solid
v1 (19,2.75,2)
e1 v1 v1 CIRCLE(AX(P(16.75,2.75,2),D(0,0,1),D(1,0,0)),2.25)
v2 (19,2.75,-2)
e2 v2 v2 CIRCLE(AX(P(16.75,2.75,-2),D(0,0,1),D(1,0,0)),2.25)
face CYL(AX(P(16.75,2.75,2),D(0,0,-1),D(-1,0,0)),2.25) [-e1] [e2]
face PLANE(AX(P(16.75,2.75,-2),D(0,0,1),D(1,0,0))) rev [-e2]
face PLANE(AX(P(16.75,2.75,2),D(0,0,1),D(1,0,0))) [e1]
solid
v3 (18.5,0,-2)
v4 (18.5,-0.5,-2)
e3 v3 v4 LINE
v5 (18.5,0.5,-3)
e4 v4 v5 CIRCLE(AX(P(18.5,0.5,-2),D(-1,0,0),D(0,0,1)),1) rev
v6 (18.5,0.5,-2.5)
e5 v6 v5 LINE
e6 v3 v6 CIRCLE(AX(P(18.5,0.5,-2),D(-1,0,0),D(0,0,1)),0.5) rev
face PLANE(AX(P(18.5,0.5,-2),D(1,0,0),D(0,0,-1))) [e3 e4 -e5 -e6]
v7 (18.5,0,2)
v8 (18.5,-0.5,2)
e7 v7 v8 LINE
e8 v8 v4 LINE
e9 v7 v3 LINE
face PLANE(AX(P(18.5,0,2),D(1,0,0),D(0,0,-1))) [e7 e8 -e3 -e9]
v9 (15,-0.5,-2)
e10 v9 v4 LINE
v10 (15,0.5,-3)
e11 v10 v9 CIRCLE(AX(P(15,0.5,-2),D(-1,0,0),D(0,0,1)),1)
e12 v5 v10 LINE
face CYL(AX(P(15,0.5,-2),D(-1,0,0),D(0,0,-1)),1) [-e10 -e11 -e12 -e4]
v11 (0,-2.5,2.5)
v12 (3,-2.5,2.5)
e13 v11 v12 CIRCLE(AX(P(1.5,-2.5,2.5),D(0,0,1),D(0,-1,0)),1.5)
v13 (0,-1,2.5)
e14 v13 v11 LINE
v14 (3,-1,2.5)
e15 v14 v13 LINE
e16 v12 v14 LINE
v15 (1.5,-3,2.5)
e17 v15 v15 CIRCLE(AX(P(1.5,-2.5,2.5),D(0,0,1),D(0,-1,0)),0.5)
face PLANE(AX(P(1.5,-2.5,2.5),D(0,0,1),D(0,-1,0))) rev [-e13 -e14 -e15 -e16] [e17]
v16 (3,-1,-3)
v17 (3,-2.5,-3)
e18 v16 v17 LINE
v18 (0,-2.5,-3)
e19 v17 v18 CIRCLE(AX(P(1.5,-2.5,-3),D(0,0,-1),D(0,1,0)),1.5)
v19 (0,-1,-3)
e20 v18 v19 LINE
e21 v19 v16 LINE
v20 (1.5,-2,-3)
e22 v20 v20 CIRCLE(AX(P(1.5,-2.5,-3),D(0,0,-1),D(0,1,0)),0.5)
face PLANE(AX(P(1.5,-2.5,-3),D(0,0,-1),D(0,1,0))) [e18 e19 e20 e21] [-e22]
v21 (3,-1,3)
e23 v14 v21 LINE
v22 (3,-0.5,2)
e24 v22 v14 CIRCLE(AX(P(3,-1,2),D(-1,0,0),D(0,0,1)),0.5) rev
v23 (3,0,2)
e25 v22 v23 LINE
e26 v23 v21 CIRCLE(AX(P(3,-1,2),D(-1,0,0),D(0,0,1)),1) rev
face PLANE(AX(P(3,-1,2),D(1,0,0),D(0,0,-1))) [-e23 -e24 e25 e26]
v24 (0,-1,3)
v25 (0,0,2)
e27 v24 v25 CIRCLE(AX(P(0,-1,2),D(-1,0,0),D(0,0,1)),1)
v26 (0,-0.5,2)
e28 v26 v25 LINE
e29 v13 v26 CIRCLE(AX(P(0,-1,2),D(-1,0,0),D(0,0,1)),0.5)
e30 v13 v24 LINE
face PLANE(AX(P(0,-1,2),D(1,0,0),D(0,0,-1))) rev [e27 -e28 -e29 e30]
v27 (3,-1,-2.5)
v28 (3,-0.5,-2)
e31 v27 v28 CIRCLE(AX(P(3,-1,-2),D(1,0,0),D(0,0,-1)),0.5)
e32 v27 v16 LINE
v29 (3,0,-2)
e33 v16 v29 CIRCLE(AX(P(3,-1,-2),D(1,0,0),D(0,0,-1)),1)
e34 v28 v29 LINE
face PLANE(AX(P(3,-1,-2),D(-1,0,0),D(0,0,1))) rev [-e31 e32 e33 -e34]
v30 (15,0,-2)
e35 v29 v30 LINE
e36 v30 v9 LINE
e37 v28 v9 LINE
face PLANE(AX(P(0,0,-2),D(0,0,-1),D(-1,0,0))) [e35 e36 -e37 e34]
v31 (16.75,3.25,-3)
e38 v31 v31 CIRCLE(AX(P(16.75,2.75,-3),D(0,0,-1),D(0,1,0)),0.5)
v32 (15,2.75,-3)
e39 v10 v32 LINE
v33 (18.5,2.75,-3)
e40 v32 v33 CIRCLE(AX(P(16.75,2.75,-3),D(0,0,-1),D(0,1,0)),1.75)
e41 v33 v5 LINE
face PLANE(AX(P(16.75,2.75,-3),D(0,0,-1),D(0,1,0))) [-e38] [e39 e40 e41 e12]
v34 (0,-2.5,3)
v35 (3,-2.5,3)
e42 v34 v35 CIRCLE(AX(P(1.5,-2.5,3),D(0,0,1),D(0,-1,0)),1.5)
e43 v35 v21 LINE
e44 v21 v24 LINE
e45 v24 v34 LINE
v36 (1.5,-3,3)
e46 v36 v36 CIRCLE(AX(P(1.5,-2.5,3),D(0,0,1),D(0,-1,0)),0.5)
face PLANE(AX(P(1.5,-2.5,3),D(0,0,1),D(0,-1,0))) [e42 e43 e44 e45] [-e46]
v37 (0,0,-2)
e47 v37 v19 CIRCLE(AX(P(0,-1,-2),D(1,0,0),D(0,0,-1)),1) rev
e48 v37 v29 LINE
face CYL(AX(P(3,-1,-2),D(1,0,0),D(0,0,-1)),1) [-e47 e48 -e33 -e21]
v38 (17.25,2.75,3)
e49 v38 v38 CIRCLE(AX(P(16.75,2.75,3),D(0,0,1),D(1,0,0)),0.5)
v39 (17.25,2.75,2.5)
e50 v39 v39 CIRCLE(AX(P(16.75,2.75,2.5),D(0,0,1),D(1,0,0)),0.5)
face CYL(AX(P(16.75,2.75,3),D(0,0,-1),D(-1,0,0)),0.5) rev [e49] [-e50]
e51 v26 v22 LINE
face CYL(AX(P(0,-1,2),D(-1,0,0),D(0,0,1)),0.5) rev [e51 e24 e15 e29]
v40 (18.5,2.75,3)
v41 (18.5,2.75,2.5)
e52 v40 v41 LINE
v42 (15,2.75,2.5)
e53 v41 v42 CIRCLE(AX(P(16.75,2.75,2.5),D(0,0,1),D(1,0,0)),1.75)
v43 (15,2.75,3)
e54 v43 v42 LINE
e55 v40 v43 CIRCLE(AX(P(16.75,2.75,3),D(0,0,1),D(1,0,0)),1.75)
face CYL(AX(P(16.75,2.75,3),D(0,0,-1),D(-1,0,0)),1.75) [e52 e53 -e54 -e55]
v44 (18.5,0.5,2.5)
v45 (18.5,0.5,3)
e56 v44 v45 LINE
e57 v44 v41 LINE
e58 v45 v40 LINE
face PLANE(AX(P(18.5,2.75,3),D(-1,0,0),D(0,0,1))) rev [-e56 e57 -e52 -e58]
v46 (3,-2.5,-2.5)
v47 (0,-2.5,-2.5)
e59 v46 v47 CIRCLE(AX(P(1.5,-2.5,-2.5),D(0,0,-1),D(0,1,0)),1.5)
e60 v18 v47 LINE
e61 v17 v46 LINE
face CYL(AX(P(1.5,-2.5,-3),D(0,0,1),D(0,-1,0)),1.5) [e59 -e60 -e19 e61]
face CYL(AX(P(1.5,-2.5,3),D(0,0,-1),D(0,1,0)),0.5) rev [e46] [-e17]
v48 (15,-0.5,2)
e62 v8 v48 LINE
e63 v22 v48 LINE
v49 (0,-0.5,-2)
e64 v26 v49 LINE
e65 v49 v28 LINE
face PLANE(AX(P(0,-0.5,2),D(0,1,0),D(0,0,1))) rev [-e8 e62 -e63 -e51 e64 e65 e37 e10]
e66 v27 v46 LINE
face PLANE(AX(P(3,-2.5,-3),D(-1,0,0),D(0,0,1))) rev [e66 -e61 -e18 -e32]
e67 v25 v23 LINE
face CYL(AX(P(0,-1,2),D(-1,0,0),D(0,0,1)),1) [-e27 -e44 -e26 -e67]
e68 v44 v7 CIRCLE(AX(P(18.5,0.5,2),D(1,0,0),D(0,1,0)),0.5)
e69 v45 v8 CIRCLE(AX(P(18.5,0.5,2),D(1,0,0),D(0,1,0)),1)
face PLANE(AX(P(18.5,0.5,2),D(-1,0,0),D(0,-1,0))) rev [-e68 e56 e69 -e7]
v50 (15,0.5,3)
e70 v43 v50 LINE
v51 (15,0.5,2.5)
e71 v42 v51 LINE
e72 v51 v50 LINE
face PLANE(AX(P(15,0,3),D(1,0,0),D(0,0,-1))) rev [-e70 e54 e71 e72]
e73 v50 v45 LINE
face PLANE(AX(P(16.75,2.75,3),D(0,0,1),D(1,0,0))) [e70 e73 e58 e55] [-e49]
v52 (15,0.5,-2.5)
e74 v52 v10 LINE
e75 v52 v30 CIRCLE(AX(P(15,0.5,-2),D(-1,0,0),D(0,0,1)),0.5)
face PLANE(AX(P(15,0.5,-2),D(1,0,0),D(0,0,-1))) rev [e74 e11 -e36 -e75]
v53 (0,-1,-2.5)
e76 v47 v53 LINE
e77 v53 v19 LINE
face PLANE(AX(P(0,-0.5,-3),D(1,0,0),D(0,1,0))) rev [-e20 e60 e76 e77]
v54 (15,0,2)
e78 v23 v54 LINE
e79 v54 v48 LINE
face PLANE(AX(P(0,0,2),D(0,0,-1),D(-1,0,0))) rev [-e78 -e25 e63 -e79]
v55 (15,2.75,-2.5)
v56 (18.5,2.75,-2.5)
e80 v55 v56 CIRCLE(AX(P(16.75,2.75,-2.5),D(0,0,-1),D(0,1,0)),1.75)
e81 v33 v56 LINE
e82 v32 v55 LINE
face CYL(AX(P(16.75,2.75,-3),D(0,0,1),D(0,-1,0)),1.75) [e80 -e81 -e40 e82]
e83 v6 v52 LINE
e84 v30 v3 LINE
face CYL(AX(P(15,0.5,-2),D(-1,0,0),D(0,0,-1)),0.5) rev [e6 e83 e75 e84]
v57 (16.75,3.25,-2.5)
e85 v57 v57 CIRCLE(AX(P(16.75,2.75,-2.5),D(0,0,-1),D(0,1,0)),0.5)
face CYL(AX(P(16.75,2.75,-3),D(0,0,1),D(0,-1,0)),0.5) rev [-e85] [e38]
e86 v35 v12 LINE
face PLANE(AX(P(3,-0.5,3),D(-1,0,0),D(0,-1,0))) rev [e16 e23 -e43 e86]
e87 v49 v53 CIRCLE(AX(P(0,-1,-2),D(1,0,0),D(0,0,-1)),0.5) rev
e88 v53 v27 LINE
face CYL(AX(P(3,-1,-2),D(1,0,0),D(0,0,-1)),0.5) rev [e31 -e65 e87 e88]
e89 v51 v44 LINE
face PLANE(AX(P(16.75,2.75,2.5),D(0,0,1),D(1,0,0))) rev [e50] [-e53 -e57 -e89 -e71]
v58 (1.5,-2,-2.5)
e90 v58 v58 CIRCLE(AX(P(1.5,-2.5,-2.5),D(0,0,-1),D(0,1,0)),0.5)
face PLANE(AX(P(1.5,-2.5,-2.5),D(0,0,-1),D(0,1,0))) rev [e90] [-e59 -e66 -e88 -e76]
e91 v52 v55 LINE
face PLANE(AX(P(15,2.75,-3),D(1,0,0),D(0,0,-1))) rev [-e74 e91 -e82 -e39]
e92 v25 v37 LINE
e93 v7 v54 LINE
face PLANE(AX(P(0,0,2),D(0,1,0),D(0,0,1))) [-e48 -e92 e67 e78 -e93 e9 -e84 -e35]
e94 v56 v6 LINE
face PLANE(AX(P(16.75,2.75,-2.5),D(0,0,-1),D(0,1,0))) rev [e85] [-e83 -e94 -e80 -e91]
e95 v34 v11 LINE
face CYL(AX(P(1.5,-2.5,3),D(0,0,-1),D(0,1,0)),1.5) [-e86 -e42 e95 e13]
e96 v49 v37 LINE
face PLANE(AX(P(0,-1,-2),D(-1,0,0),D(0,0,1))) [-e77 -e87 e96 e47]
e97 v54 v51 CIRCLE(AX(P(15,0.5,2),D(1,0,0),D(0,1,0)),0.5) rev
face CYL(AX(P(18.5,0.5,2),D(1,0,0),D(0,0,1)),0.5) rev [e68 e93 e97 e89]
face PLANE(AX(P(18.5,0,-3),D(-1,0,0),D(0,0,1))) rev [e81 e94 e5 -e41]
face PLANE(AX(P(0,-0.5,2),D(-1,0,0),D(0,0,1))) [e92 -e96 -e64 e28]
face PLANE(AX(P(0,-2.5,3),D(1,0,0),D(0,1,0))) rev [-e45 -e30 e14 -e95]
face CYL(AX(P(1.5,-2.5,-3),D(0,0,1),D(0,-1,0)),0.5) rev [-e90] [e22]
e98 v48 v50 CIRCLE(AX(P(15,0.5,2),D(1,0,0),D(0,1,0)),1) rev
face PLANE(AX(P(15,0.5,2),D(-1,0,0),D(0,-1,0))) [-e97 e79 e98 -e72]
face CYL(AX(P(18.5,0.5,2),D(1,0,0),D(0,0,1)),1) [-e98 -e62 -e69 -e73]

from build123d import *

# Parameters (mm, degrees)
ESQUISSE1_W                        = 18.5
ESQUISSE1_H                        = 0.5
T_LE_DE_BASE_PLI_E1_DEPTH          = 2
T_LE_PLI_E_SUR_AR_TE1_DEPTH        = 3.5
T_LE_START                         = 0.5
T_LE_PLI_E_SUR_AR_TE1_PROFILE_R    = 0.5
T_LE_PLI_E_SUR_AR_TE1_FLAT_DEPTH   = 0.5
T_LE_PLI_E_SUR_AR_TE1_BEND_DEPTH   = 3.5
T_LE_PLI_E_SUR_AR_TE1_PROFILE_2_R  = 0.5
T_LE_PLI_E_SUR_AR_TE1_FLAT_2_DEPTH = 0.5
ESQUISSE12_R                       = 2.25
BOSS_EXTRU_1_DEPTH                 = 2
T_LE_PLI_E_SUR_AR_TE2_DEPTH        = 3
T_LE_PLI_E_SUR_AR_TE2_PROFILE_R    = 0.5
T_LE_PLI_E_SUR_AR_TE2_FLAT_DEPTH   = 0.5
T_LE_PLI_E_SUR_AR_TE2_BEND_DEPTH   = 3
T_LE_PLI_E_SUR_AR_TE2_PROFILE_2_R  = 0.5
T_LE_PLI_E_SUR_AR_TE2_FLAT_2_DEPTH = 0.5


# Sheet-metal steps are written as plain solids
with BuildPart() as part:
    # Esquisse1 → Tôle de base pliée1 (new, symmetric)
    with BuildSketch(Plane.XY):
        with Locations((9.25, -0.25)):
            Rectangle(ESQUISSE1_W, ESQUISSE1_H)
    extrude(amount=T_LE_DE_BASE_PLI_E1_DEPTH, both=True)

    # Tôle pliée sur arête1 bend section (across the edge) → Tôle pliée sur arête1 (add)
    with BuildSketch(Plane(origin=(15, 0, 2.5), x_dir=(0, 0, -1), z_dir=(1, 0, 0))):
        with BuildLine():
            Line((-0.5, 0.5), (0, 0.5))
            ThreePointArc((0, 0.5), (0.146446609, 0.146446609), (0.5, 0))
            Line((0.5, 0), (0.5, -0.5))
            ThreePointArc((0.5, -0.5), (-0.207106781, -0.207106781), (-0.5, 0.5))
        make_face()
    extrude(amount=T_LE_PLI_E_SUR_AR_TE1_DEPTH)

    # Tôle pliée sur arête1 profile (on flange) → Tôle pliée sur arête1 flat (add)
    with BuildSketch(Plane.XY.offset(2.5).offset(T_LE_START)):
        with BuildLine():
            Line((15, 0.5), (18.5, 0.5))
            Line((18.5, 0.5), (18.5, 2.75))
            ThreePointArc((18.5, 2.75), (16.75, 4.5), (15, 2.75))
            Line((15, 2.75), (15, 0.5))
        make_face()
        with Locations((16.75, 2.75)):
            Circle(T_LE_PLI_E_SUR_AR_TE1_PROFILE_R, mode=Mode.SUBTRACT)
    extrude(amount=-T_LE_PLI_E_SUR_AR_TE1_FLAT_DEPTH)

    # Tôle pliée sur arête1 bend section 2 (across the edge) → Tôle pliée sur arête1 bend (add)
    with BuildSketch(Plane(origin=(18.5, 0, -2.5), x_dir=(0, 0, 1), z_dir=(-1, 0, 0))):
        with BuildLine():
            Line((-0.5, 0.5), (0, 0.5))
            ThreePointArc((0, 0.5), (0.146446609, 0.146446609), (0.5, 0))
            Line((0.5, 0), (0.5, -0.5))
            ThreePointArc((0.5, -0.5), (-0.207106781, -0.207106781), (-0.5, 0.5))
        make_face()
    extrude(amount=T_LE_PLI_E_SUR_AR_TE1_BEND_DEPTH)

    # Tôle pliée sur arête1 profile 2 (on flange) → Tôle pliée sur arête1 flat 2 (add)
    with BuildSketch(Plane(origin=(0, 0, -2.5), x_dir=(-1, 0, 0), z_dir=(0, 0, -1)).offset(T_LE_START)):
        with BuildLine():
            Line((-18.5, 2.75), (-18.5, 0.5))
            Line((-18.5, 0.5), (-15, 0.5))
            Line((-15, 0.5), (-15, 2.75))
            ThreePointArc((-15, 2.75), (-16.75, 4.5), (-18.5, 2.75))
        make_face()
        with Locations((-16.75, 2.75)):
            Circle(T_LE_PLI_E_SUR_AR_TE1_PROFILE_2_R, mode=Mode.SUBTRACT)
    extrude(amount=-T_LE_PLI_E_SUR_AR_TE1_FLAT_2_DEPTH)

    # Tôle pliée sur arête2 bend section (across the edge) → Tôle pliée sur arête2 (add)
    with BuildSketch(Plane(origin=(3, -0.5, 2.5), x_dir=(0, 0, -1), z_dir=(-1, 0, 0))):
        with BuildLine():
            Line((-0.5, 0.5), (0, 0.5))
            ThreePointArc((0, 0.5), (0.146446609, 0.146446609), (0.5, 0))
            Line((0.5, 0), (0.5, -0.5))
            ThreePointArc((0.5, -0.5), (-0.207106781, -0.207106781), (-0.5, 0.5))
        make_face()
    extrude(amount=T_LE_PLI_E_SUR_AR_TE2_DEPTH)

    # Tôle pliée sur arête2 profile (on flange) → Tôle pliée sur arête2 flat (add)
    with BuildSketch(Plane(origin=(0, -0.5, 2.5), x_dir=(-1, 0, 0), z_dir=(0, 0, 1)).offset(T_LE_START)):
        with BuildLine():
            ThreePointArc((0, 2), (-1.5, 3.5), (-3, 2))
            Line((-3, 2), (-3, 0.5))
            Line((-3, 0.5), (0, 0.5))
            Line((0, 0.5), (0, 2))
        make_face()
        with Locations((-1.5, 2)):
            Circle(T_LE_PLI_E_SUR_AR_TE2_PROFILE_R, mode=Mode.SUBTRACT)
    extrude(amount=-T_LE_PLI_E_SUR_AR_TE2_FLAT_DEPTH)

    # Tôle pliée sur arête2 bend section 2 (across the edge) → Tôle pliée sur arête2 bend (add)
    with BuildSketch(Plane(origin=(0, -0.5, -2.5), x_dir=(0, 0, 1), z_dir=(1, 0, 0))):
        with BuildLine():
            Line((-0.5, 0.5), (0, 0.5))
            ThreePointArc((0, 0.5), (0.146446609, 0.146446609), (0.5, 0))
            Line((0.5, 0), (0.5, -0.5))
            ThreePointArc((0.5, -0.5), (-0.207106781, -0.207106781), (-0.5, 0.5))
        make_face()
    extrude(amount=T_LE_PLI_E_SUR_AR_TE2_BEND_DEPTH)

    # Tôle pliée sur arête2 profile 2 (on flange) → Tôle pliée sur arête2 flat 2 (add)
    with BuildSketch(Plane(origin=(0, -0.5, -2.5), x_dir=(1, 0, 0), z_dir=(0, 0, -1)).offset(T_LE_START)):
        with BuildLine():
            ThreePointArc((3, 2), (1.5, 3.5), (0, 2))
            Line((0, 2), (0, 0.5))
            Line((0, 0.5), (3, 0.5))
            Line((3, 0.5), (3, 2))
        make_face()
        with Locations((1.5, 2)):
            Circle(T_LE_PLI_E_SUR_AR_TE2_PROFILE_2_R, mode=Mode.SUBTRACT)
    extrude(amount=-T_LE_PLI_E_SUR_AR_TE2_FLAT_2_DEPTH)


with BuildPart() as body_2:
    # Esquisse12 → Boss.-Extru.1 (new, symmetric)
    with BuildSketch(Plane.XY):
        with Locations((16.75, 2.75)):
            Circle(ESQUISSE12_R)
    extrude(amount=BOSS_EXTRU_1_DEPTH, both=True)


solid = Compound([part.part, body_2.part])
